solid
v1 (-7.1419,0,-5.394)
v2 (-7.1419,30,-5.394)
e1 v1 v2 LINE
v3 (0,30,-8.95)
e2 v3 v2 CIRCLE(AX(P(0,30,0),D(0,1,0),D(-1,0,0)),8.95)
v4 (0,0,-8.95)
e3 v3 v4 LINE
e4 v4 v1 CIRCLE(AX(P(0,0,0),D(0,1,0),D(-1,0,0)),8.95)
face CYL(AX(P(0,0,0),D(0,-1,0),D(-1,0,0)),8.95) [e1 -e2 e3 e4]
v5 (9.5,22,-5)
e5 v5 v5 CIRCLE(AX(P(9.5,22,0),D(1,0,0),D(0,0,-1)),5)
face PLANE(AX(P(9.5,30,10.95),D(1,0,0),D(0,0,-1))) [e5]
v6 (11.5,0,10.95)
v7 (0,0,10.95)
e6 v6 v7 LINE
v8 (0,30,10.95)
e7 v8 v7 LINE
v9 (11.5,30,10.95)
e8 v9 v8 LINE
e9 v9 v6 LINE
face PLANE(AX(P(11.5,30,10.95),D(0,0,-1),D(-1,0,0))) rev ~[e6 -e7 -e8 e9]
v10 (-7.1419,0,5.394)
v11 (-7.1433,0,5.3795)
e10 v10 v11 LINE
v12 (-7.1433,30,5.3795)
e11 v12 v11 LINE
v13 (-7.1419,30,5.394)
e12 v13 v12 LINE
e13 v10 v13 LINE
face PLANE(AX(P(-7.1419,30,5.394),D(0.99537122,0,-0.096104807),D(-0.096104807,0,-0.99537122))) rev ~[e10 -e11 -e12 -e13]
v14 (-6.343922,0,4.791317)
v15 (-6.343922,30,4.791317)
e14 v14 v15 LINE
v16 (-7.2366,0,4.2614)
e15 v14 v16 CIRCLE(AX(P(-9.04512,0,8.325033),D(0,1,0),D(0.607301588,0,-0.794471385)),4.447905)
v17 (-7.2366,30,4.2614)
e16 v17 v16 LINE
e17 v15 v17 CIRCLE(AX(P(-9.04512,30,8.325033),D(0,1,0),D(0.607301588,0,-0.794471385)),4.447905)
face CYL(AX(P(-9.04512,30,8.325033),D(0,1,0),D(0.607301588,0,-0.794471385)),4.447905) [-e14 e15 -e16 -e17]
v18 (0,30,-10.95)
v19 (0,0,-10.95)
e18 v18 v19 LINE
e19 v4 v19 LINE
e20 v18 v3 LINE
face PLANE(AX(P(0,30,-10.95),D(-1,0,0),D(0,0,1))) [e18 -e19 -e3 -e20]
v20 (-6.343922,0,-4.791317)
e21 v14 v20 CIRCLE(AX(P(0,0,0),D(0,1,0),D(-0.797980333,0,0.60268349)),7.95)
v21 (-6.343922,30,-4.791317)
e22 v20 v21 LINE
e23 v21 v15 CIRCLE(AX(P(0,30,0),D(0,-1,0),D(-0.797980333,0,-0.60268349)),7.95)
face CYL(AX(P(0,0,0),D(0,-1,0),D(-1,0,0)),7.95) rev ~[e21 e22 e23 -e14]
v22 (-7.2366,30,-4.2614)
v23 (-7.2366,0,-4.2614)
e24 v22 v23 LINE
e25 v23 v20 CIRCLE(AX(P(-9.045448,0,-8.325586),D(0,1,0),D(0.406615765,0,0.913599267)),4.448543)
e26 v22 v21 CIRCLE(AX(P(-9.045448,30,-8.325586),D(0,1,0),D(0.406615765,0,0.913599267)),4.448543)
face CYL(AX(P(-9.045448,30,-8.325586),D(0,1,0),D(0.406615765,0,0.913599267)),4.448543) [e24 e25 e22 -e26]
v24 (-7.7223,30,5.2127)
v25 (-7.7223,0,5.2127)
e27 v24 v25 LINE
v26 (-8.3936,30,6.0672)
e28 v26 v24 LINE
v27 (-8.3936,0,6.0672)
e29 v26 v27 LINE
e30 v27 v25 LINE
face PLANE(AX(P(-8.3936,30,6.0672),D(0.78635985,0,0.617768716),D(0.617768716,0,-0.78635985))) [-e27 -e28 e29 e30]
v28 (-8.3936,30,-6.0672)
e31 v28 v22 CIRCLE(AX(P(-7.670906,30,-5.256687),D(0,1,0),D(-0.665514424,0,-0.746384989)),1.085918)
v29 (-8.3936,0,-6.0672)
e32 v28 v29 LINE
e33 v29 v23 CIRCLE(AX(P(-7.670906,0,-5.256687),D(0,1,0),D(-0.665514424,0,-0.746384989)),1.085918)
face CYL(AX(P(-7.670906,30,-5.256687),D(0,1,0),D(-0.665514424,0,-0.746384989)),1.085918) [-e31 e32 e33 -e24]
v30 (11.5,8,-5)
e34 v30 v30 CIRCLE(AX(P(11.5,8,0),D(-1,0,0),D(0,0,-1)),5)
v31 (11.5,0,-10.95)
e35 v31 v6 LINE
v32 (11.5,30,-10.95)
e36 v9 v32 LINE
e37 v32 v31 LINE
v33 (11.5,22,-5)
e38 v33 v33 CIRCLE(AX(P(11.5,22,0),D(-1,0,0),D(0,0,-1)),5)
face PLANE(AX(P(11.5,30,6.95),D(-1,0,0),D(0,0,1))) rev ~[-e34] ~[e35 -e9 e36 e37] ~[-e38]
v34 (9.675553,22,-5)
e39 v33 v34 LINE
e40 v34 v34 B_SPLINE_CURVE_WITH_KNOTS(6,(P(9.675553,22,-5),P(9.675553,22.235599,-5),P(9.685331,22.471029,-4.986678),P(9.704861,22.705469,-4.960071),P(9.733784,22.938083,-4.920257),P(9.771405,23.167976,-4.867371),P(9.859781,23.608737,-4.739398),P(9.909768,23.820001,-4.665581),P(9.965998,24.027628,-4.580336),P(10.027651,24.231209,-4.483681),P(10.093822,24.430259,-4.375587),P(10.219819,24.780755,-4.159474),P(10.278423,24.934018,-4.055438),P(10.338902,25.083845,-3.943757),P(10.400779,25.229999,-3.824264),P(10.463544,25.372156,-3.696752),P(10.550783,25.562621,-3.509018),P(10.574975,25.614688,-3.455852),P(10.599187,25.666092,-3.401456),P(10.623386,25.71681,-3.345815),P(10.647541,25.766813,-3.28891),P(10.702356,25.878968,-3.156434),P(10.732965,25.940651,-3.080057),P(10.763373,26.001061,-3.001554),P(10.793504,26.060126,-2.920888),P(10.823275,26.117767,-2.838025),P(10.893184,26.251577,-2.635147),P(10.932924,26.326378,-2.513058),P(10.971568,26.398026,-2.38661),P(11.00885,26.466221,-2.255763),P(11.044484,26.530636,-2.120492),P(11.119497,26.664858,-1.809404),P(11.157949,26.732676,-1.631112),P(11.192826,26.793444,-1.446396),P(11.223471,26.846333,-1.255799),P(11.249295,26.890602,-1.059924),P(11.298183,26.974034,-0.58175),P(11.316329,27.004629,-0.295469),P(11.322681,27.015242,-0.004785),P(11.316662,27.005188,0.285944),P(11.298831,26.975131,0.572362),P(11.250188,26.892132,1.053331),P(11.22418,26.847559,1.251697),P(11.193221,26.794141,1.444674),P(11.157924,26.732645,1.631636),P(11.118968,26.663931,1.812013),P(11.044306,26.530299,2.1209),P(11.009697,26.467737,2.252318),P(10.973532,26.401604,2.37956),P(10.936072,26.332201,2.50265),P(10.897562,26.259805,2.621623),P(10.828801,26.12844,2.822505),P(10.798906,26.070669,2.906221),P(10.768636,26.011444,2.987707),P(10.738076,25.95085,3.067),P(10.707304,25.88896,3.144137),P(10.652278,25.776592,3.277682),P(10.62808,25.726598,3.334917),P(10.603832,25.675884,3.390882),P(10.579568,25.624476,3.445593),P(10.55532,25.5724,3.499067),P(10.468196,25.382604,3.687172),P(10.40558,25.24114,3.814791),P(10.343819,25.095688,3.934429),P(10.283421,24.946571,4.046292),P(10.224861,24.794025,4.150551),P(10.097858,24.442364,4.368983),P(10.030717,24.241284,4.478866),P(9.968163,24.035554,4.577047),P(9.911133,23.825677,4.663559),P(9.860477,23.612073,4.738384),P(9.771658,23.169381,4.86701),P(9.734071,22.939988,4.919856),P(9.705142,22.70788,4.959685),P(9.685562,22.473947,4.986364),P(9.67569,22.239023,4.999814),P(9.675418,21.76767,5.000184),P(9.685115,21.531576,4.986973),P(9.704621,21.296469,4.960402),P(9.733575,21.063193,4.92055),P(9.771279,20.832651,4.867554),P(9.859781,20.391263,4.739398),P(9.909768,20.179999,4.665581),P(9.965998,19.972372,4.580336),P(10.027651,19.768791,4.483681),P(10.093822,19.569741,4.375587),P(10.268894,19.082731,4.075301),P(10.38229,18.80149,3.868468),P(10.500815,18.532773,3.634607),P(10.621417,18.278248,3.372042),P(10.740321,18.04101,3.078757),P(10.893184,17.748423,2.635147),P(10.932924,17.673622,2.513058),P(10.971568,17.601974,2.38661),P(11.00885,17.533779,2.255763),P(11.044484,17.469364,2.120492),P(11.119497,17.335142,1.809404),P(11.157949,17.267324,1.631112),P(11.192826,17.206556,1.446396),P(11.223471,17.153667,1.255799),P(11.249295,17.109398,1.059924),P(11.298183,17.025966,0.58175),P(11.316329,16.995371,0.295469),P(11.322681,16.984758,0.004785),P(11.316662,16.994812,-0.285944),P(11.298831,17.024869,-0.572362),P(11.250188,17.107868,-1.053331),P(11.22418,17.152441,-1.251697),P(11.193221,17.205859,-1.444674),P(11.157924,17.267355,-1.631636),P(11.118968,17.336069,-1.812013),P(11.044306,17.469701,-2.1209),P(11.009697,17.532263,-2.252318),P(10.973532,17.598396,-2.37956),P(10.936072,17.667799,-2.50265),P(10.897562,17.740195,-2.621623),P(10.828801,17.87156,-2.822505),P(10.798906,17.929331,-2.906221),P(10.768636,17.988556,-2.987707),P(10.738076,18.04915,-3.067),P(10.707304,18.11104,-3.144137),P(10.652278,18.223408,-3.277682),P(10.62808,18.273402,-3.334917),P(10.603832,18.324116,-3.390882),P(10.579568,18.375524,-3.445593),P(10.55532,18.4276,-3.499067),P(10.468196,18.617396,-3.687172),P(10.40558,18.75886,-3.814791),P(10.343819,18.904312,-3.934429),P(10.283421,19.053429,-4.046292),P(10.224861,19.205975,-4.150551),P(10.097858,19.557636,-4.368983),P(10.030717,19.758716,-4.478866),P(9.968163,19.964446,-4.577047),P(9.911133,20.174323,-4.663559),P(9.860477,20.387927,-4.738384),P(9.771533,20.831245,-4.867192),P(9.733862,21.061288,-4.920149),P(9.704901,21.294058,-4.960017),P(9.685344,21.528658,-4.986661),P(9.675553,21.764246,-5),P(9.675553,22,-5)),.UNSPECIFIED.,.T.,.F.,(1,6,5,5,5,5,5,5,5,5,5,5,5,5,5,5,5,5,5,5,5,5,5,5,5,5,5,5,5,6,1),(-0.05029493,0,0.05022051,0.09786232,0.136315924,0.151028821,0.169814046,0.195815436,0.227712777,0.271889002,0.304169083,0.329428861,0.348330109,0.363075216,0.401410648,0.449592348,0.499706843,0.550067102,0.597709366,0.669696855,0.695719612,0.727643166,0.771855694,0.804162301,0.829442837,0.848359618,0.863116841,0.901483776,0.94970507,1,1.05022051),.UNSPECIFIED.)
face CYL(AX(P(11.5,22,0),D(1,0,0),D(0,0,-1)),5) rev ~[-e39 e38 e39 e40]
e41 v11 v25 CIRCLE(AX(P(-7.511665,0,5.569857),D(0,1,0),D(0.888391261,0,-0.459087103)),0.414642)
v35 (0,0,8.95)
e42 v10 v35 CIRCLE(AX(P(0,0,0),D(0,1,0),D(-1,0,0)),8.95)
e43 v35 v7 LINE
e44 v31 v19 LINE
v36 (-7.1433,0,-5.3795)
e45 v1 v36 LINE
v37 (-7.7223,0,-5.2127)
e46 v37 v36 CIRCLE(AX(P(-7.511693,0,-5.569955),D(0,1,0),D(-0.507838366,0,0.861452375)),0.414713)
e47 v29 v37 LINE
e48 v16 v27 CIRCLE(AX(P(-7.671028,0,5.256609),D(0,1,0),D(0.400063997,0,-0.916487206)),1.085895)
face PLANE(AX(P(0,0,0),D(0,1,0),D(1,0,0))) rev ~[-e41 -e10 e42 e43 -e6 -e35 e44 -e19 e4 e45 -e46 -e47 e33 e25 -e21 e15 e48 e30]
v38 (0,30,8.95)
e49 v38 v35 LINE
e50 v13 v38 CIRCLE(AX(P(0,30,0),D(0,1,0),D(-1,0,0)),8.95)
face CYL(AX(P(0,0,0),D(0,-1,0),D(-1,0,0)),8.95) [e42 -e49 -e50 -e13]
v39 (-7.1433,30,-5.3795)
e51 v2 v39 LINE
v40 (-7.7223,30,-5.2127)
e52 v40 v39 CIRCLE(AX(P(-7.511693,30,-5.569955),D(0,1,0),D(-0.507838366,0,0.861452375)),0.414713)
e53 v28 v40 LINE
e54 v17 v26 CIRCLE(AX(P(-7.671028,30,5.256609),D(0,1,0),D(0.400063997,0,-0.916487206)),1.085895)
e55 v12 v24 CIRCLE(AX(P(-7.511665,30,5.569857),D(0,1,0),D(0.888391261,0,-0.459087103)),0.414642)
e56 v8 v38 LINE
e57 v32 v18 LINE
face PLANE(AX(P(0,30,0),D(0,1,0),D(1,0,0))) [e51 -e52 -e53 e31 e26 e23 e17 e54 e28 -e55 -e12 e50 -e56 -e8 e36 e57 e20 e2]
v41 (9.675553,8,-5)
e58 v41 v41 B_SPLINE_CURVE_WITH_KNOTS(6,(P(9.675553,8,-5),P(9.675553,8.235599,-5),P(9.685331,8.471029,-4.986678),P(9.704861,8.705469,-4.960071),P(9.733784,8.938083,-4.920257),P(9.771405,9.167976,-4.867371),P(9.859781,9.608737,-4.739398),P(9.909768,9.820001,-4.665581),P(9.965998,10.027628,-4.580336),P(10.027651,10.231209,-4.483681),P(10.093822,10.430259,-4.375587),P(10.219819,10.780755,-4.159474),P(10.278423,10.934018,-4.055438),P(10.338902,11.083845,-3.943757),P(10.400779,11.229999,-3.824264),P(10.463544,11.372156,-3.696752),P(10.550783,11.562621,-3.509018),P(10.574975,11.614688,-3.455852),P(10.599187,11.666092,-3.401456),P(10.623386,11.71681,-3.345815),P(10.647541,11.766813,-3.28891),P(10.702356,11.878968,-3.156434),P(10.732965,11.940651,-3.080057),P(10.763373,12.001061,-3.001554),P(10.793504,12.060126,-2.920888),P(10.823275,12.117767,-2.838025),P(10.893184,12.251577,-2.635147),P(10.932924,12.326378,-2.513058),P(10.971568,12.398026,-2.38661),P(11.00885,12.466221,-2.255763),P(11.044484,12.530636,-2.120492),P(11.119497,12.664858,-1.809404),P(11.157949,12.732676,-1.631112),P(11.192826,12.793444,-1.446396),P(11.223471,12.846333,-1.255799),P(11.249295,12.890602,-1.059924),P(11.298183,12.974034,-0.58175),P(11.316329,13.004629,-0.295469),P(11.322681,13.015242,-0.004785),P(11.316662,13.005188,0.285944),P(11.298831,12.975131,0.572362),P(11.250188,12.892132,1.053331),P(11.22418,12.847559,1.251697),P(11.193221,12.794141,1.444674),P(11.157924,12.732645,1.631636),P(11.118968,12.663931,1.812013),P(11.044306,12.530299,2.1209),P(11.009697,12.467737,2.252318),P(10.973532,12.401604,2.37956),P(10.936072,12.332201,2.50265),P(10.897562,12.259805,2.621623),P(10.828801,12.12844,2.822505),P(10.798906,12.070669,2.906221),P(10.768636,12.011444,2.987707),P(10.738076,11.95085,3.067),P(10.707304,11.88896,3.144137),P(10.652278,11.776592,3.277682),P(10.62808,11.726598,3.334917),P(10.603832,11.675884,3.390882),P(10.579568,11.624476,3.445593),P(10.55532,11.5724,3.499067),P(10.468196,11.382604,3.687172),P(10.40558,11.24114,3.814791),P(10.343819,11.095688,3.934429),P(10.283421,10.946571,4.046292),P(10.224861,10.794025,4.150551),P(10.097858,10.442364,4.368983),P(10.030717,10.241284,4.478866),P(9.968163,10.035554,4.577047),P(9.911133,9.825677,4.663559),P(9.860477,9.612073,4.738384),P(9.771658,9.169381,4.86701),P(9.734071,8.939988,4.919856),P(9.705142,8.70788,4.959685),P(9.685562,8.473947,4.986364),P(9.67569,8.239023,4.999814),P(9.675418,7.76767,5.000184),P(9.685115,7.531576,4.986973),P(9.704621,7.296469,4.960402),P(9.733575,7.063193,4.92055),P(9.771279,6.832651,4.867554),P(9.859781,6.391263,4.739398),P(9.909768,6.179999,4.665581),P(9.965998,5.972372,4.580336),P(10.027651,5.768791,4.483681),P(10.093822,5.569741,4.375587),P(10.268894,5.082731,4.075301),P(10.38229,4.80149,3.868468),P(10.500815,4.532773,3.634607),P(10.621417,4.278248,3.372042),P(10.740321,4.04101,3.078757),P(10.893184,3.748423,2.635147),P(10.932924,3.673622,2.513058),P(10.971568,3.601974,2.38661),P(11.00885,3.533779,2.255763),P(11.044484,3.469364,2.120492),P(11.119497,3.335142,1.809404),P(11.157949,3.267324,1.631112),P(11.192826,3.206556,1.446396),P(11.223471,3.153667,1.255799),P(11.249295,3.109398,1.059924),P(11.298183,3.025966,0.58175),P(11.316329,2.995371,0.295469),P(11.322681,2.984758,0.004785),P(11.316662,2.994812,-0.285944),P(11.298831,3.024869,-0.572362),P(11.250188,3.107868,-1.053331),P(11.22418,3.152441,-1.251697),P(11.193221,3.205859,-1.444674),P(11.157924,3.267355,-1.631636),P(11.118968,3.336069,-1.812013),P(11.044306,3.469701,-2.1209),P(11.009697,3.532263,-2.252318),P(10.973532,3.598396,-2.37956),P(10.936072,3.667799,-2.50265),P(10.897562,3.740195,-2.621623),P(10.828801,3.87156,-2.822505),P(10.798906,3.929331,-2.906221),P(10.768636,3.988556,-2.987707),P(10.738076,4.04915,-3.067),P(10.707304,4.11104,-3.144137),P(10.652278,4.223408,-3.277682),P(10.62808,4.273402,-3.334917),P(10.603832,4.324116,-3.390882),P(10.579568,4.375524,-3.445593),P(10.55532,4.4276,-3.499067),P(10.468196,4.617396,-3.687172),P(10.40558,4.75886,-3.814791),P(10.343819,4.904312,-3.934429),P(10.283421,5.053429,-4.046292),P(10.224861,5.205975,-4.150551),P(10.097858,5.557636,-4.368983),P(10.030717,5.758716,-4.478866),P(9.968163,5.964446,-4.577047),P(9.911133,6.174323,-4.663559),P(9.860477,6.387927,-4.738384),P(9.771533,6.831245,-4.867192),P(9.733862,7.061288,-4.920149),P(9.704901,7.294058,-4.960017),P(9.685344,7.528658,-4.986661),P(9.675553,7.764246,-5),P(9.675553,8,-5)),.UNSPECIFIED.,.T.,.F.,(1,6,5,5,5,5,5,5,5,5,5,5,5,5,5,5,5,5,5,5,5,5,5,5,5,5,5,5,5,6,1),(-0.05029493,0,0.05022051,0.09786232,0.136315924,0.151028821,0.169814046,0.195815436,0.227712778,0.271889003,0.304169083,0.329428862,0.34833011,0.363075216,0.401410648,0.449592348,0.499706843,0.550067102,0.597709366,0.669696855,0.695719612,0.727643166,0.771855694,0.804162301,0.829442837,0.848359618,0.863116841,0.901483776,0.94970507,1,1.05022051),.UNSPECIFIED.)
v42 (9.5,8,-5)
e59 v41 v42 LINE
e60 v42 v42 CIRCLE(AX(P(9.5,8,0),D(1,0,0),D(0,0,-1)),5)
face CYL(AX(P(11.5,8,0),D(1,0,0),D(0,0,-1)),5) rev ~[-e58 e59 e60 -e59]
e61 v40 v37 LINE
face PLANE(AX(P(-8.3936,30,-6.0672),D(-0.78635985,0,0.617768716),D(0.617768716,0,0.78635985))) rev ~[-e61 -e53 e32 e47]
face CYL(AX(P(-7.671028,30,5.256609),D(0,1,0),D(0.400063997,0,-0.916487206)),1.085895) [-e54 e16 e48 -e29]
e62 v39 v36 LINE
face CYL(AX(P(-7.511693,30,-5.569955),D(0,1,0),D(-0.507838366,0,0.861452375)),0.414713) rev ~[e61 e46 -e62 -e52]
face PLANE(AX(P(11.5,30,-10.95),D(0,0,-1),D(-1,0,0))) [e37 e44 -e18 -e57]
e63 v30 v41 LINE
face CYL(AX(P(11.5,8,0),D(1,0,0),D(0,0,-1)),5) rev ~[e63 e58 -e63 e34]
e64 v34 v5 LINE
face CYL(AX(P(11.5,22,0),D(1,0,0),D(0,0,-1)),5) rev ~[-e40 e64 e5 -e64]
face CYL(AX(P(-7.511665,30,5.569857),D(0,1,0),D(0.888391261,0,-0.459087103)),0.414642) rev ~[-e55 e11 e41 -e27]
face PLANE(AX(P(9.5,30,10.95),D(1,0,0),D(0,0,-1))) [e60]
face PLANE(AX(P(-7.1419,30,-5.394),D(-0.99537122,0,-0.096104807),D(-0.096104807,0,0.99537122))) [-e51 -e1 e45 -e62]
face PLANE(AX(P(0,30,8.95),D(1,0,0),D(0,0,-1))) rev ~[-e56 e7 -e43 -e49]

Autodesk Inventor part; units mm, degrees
ref_plane "YZ Plane" through (0, 0, 0) normal (1, 0, 0) x (0, 1, 0)
ref_plane "XZ Plane" through (0, 0, 0) normal (0, 1, 0) x (-1, 0, 0)
ref_plane "XY Plane" through (0, 0, 0) normal (0, 0, 1) x (1, 0, 0)
sketch "Эскиз1" plane through (0, 0, 0) normal (0, 1, 0) x (-1, 0, 0)
  circle A0 centre (0, 0) radius 7.95
  circle A1 centre (0, 0) radius 8.95
  line L0 (0, 0) -> (7.1419, 5.394)
  line L1 (0, 0) -> (7.1419, -5.394)
  point P0 (6.3439, -4.7913)
  point P1 (6.3439, 4.7913)
  dimension "d0" = 15.9
  dimension "d1" = 17.9
extrude "Выдавливание1" add sketch "Эскиз1" along normal blind 30 contours A0 L1 A1 L0 picked at (-8.5243, 0.7366)
sketch "Эскиз2" plane through (0, 30, 0) normal (0, 1, 0) x (1, 0, 0)
  arc A0 (-6.3439, -4.7913) -> (-7.2366, -4.2614) centre (-9.0453, -8.3253) ccw
  arc A1 (-7.2366, -4.2614) -> (-8.3936, -6.0672) centre (-7.671, -5.2567) ccw
  line L0 (-8.3936, -6.0672) -> (-7.7223, -5.2127)
  arc A2 (-7.1433, -5.3795) -> (-7.7223, -5.2127) centre (-7.5117, -5.5699) ccw
  line L1 (-6.3439, -4.7913) -> (-7.1419, -5.394)
  line L2 (-7.1419, -5.394) -> (-6.3439, -4.7913)
  line L3 (-7.1419, -5.394) -> (-7.1433, -5.3795)
  line L4 (-0.0151, 0) -> (-3.489, 0)
  arc A3 (-7.2366, 4.2614) -> (-6.3439, 4.7913) centre (-9.0453, 8.3253) ccw
  arc A4 (-7.7223, 5.2127) -> (-7.1433, 5.3795) centre (-7.5117, 5.5699) ccw
  line L5 (-6.3439, 4.7913) -> (-7.1419, 5.394)
  line L6 (-7.1419, 5.394) -> (-6.3439, 4.7913)
  line L7 (-7.1419, 5.394) -> (-7.1433, 5.3795)
  arc A5 (-8.3936, 6.0672) -> (-7.2366, 4.2614) centre (-7.671, 5.2567) ccw
  line L8 (-8.3936, 6.0672) -> (-7.7223, 5.2127)
  point P0 (-6.3439, 4.7913)
  point P1 (-7.1419, -5.394)
  point P2 (-5.3694, -4.0591)
  point P3 (-7.1419, 5.394)
  point P4 (-5.3694, 4.0591)
  point P5 (-7.1419, 5.394)
  dimension "d25" = 1.0859
sketch "Эскиз3" plane through (0, 30, 0) normal (0, 1, 0) x (1, 0, 0)
  arc A0 (-7.1419, -5.394) -> (-7.1419, 5.394) centre (0, 0) ccw projected
  line L0 (11.5, -6.95) -> (11.5, 6.95)
  arc A1 (-6.3439, -4.7913) -> (-6.3439, 4.7913) centre (0, 0) ccw projected
  arc A2 (0, -7.95) -> (0, 7.95) centre (2.8636, 0) ccw
  line L1 (0, -8.95) -> (0, -7.95)
  line L2 (0, 7.95) -> (0, 8.95)
  line L3 (11.5, 6.95) -> (11.5, 10.95)
  line L4 (11.5, -6.95) -> (11.5, -10.95)
  line L5 (0, 4.45) -> (0, 8.95)
  line L6 (11.5, -10.95) -> (0, -10.95)
  line L7 (0, -10.95) -> (0, -8.95)
  line L8 (11.5, 10.95) -> (0, 10.95)
  line L9 (0, 10.95) -> (0, 8.95)
  point P0 (0, 7.95)
  dimension "d13" = 4
  dimension "d14" = 4
  dimension "d22" = 21.9
  dimension "d23" = 3
extrude "Выдавливание3" add sketch "Эскиз3" against normal blind 30 contours L1 A2 A0 | A0 A2 L9 L8 L3 L0 L4 L6 L7 | A2 L2 A0
ref_plane "РабПлоскость1" through (11.5, 20, 4.95) normal (1, 0, 0) x (0, 0, -1)
sketch "Эскиз4" plane through (11.5, 20, 4.95) normal (1, 0, 0) x (0, 0, -1)
  line L0 (4.95, -20) -> (4.95, 10)
  line L1 (1, 10) -> (8.9, 10) projected
  circle A0 centre (4.95, -12) radius 5
  line L2 (14.4, -20) -> (-4.5, -20) projected
  circle A1 centre (4.95, 2) radius 5
  line L3 (-4.5, 10) -> (14.4, 10) projected
  point P0 (7.3306, 10)
  point P1 (2.5694, 10)
  point P2 (4.95, 10)
  dimension "d15" = 10
  dimension "d16" = 8
  dimension "d17" = 10
  dimension "d18" = 8
extrude "Выдавливание4" cut sketch "Эскиз4" against normal blind 2
extrude "Выдавливание5" add sketch "Эскиз2" against normal blind 30
sketch "Эскиз5" plane through (0, 30, 0) normal (0, 1, 0) x (1, 0, 0)
  arc A0 (0, 8.95) -> (-7.1419, 5.394) centre (0, 0) ccw projected
  line L0 (-7.1419, 5.394) -> (-7.1433, 5.3795) projected
  arc A1 (-7.7223, 5.2127) -> (-7.1433, 5.3795) centre (-7.5117, 5.5699) ccw projected
  line L1 (-7.7223, 5.2127) -> (-8.3936, 6.0672) projected
  arc A2 (-8.3936, 6.0672) -> (-7.2366, 4.2614) centre (-7.671, 5.2567) ccw projected
  arc A3 (-7.2366, 4.2614) -> (-6.3439, 4.7913) centre (-9.0453, 8.3253) ccw projected
  arc A4 (-6.3439, -4.7913) -> (-6.3439, 4.7913) centre (0, 0) ccw projected
  arc A5 (-6.3439, -4.7913) -> (-7.2366, -4.2614) centre (-9.0453, -8.3253) ccw projected
  arc A6 (-7.2366, -4.2614) -> (-8.3936, -6.0672) centre (-7.671, -5.2567) ccw projected
  line L2 (-8.3936, -6.0672) -> (-7.7223, -5.2127) projected
  arc A7 (-7.1433, -5.3795) -> (-7.7223, -5.2127) centre (-7.5117, -5.5699) ccw projected
  line L3 (-7.1433, -5.3795) -> (-7.1419, -5.394) projected
  arc A8 (-7.1419, -5.394) -> (0, -8.95) centre (0, 0) ccw projected
  line L4 (0, -8.95) -> (0, -10.95) projected
  line L5 (0, -10.95) -> (11.5, -10.95) projected
  line L6 (11.5, -10.95) -> (11.5, 10.95) projected
  line L7 (11.5, 10.95) -> (0, 10.95) projected
  line L8 (0, 10.95) -> (0, 8.95) projected
  arc A9 (2.9509, -8.4495) -> (2.9509, 8.4495) centre (2.8636, 0) ccw projected
  arc A10 (2.9509, -8.4495) -> (2.9509, 8.4495) centre (0, 0) ccw projected
  line L9 (0, 7.95) -> (0, 8.95)
  line L10 (0, -7.95) -> (0, -8.95)
extrude "Выдавливание6" add sketch "Эскиз5" against normal blind 30 contours A10 A9
sketch "Эскиз6" plane through (11.5, 30, 10.95) normal (1, 0, 0) x (0, 0, -1)
  circle A0 centre (10.95, -22) radius 5 projected
  circle A1 centre (10.95, -8) radius 5 projected
  point P0 (10.95, -30)
extrude "Выдавливание7" cut sketch "Эскиз6" against normal blind 2
properties part number "крепление маркера 16мм"
